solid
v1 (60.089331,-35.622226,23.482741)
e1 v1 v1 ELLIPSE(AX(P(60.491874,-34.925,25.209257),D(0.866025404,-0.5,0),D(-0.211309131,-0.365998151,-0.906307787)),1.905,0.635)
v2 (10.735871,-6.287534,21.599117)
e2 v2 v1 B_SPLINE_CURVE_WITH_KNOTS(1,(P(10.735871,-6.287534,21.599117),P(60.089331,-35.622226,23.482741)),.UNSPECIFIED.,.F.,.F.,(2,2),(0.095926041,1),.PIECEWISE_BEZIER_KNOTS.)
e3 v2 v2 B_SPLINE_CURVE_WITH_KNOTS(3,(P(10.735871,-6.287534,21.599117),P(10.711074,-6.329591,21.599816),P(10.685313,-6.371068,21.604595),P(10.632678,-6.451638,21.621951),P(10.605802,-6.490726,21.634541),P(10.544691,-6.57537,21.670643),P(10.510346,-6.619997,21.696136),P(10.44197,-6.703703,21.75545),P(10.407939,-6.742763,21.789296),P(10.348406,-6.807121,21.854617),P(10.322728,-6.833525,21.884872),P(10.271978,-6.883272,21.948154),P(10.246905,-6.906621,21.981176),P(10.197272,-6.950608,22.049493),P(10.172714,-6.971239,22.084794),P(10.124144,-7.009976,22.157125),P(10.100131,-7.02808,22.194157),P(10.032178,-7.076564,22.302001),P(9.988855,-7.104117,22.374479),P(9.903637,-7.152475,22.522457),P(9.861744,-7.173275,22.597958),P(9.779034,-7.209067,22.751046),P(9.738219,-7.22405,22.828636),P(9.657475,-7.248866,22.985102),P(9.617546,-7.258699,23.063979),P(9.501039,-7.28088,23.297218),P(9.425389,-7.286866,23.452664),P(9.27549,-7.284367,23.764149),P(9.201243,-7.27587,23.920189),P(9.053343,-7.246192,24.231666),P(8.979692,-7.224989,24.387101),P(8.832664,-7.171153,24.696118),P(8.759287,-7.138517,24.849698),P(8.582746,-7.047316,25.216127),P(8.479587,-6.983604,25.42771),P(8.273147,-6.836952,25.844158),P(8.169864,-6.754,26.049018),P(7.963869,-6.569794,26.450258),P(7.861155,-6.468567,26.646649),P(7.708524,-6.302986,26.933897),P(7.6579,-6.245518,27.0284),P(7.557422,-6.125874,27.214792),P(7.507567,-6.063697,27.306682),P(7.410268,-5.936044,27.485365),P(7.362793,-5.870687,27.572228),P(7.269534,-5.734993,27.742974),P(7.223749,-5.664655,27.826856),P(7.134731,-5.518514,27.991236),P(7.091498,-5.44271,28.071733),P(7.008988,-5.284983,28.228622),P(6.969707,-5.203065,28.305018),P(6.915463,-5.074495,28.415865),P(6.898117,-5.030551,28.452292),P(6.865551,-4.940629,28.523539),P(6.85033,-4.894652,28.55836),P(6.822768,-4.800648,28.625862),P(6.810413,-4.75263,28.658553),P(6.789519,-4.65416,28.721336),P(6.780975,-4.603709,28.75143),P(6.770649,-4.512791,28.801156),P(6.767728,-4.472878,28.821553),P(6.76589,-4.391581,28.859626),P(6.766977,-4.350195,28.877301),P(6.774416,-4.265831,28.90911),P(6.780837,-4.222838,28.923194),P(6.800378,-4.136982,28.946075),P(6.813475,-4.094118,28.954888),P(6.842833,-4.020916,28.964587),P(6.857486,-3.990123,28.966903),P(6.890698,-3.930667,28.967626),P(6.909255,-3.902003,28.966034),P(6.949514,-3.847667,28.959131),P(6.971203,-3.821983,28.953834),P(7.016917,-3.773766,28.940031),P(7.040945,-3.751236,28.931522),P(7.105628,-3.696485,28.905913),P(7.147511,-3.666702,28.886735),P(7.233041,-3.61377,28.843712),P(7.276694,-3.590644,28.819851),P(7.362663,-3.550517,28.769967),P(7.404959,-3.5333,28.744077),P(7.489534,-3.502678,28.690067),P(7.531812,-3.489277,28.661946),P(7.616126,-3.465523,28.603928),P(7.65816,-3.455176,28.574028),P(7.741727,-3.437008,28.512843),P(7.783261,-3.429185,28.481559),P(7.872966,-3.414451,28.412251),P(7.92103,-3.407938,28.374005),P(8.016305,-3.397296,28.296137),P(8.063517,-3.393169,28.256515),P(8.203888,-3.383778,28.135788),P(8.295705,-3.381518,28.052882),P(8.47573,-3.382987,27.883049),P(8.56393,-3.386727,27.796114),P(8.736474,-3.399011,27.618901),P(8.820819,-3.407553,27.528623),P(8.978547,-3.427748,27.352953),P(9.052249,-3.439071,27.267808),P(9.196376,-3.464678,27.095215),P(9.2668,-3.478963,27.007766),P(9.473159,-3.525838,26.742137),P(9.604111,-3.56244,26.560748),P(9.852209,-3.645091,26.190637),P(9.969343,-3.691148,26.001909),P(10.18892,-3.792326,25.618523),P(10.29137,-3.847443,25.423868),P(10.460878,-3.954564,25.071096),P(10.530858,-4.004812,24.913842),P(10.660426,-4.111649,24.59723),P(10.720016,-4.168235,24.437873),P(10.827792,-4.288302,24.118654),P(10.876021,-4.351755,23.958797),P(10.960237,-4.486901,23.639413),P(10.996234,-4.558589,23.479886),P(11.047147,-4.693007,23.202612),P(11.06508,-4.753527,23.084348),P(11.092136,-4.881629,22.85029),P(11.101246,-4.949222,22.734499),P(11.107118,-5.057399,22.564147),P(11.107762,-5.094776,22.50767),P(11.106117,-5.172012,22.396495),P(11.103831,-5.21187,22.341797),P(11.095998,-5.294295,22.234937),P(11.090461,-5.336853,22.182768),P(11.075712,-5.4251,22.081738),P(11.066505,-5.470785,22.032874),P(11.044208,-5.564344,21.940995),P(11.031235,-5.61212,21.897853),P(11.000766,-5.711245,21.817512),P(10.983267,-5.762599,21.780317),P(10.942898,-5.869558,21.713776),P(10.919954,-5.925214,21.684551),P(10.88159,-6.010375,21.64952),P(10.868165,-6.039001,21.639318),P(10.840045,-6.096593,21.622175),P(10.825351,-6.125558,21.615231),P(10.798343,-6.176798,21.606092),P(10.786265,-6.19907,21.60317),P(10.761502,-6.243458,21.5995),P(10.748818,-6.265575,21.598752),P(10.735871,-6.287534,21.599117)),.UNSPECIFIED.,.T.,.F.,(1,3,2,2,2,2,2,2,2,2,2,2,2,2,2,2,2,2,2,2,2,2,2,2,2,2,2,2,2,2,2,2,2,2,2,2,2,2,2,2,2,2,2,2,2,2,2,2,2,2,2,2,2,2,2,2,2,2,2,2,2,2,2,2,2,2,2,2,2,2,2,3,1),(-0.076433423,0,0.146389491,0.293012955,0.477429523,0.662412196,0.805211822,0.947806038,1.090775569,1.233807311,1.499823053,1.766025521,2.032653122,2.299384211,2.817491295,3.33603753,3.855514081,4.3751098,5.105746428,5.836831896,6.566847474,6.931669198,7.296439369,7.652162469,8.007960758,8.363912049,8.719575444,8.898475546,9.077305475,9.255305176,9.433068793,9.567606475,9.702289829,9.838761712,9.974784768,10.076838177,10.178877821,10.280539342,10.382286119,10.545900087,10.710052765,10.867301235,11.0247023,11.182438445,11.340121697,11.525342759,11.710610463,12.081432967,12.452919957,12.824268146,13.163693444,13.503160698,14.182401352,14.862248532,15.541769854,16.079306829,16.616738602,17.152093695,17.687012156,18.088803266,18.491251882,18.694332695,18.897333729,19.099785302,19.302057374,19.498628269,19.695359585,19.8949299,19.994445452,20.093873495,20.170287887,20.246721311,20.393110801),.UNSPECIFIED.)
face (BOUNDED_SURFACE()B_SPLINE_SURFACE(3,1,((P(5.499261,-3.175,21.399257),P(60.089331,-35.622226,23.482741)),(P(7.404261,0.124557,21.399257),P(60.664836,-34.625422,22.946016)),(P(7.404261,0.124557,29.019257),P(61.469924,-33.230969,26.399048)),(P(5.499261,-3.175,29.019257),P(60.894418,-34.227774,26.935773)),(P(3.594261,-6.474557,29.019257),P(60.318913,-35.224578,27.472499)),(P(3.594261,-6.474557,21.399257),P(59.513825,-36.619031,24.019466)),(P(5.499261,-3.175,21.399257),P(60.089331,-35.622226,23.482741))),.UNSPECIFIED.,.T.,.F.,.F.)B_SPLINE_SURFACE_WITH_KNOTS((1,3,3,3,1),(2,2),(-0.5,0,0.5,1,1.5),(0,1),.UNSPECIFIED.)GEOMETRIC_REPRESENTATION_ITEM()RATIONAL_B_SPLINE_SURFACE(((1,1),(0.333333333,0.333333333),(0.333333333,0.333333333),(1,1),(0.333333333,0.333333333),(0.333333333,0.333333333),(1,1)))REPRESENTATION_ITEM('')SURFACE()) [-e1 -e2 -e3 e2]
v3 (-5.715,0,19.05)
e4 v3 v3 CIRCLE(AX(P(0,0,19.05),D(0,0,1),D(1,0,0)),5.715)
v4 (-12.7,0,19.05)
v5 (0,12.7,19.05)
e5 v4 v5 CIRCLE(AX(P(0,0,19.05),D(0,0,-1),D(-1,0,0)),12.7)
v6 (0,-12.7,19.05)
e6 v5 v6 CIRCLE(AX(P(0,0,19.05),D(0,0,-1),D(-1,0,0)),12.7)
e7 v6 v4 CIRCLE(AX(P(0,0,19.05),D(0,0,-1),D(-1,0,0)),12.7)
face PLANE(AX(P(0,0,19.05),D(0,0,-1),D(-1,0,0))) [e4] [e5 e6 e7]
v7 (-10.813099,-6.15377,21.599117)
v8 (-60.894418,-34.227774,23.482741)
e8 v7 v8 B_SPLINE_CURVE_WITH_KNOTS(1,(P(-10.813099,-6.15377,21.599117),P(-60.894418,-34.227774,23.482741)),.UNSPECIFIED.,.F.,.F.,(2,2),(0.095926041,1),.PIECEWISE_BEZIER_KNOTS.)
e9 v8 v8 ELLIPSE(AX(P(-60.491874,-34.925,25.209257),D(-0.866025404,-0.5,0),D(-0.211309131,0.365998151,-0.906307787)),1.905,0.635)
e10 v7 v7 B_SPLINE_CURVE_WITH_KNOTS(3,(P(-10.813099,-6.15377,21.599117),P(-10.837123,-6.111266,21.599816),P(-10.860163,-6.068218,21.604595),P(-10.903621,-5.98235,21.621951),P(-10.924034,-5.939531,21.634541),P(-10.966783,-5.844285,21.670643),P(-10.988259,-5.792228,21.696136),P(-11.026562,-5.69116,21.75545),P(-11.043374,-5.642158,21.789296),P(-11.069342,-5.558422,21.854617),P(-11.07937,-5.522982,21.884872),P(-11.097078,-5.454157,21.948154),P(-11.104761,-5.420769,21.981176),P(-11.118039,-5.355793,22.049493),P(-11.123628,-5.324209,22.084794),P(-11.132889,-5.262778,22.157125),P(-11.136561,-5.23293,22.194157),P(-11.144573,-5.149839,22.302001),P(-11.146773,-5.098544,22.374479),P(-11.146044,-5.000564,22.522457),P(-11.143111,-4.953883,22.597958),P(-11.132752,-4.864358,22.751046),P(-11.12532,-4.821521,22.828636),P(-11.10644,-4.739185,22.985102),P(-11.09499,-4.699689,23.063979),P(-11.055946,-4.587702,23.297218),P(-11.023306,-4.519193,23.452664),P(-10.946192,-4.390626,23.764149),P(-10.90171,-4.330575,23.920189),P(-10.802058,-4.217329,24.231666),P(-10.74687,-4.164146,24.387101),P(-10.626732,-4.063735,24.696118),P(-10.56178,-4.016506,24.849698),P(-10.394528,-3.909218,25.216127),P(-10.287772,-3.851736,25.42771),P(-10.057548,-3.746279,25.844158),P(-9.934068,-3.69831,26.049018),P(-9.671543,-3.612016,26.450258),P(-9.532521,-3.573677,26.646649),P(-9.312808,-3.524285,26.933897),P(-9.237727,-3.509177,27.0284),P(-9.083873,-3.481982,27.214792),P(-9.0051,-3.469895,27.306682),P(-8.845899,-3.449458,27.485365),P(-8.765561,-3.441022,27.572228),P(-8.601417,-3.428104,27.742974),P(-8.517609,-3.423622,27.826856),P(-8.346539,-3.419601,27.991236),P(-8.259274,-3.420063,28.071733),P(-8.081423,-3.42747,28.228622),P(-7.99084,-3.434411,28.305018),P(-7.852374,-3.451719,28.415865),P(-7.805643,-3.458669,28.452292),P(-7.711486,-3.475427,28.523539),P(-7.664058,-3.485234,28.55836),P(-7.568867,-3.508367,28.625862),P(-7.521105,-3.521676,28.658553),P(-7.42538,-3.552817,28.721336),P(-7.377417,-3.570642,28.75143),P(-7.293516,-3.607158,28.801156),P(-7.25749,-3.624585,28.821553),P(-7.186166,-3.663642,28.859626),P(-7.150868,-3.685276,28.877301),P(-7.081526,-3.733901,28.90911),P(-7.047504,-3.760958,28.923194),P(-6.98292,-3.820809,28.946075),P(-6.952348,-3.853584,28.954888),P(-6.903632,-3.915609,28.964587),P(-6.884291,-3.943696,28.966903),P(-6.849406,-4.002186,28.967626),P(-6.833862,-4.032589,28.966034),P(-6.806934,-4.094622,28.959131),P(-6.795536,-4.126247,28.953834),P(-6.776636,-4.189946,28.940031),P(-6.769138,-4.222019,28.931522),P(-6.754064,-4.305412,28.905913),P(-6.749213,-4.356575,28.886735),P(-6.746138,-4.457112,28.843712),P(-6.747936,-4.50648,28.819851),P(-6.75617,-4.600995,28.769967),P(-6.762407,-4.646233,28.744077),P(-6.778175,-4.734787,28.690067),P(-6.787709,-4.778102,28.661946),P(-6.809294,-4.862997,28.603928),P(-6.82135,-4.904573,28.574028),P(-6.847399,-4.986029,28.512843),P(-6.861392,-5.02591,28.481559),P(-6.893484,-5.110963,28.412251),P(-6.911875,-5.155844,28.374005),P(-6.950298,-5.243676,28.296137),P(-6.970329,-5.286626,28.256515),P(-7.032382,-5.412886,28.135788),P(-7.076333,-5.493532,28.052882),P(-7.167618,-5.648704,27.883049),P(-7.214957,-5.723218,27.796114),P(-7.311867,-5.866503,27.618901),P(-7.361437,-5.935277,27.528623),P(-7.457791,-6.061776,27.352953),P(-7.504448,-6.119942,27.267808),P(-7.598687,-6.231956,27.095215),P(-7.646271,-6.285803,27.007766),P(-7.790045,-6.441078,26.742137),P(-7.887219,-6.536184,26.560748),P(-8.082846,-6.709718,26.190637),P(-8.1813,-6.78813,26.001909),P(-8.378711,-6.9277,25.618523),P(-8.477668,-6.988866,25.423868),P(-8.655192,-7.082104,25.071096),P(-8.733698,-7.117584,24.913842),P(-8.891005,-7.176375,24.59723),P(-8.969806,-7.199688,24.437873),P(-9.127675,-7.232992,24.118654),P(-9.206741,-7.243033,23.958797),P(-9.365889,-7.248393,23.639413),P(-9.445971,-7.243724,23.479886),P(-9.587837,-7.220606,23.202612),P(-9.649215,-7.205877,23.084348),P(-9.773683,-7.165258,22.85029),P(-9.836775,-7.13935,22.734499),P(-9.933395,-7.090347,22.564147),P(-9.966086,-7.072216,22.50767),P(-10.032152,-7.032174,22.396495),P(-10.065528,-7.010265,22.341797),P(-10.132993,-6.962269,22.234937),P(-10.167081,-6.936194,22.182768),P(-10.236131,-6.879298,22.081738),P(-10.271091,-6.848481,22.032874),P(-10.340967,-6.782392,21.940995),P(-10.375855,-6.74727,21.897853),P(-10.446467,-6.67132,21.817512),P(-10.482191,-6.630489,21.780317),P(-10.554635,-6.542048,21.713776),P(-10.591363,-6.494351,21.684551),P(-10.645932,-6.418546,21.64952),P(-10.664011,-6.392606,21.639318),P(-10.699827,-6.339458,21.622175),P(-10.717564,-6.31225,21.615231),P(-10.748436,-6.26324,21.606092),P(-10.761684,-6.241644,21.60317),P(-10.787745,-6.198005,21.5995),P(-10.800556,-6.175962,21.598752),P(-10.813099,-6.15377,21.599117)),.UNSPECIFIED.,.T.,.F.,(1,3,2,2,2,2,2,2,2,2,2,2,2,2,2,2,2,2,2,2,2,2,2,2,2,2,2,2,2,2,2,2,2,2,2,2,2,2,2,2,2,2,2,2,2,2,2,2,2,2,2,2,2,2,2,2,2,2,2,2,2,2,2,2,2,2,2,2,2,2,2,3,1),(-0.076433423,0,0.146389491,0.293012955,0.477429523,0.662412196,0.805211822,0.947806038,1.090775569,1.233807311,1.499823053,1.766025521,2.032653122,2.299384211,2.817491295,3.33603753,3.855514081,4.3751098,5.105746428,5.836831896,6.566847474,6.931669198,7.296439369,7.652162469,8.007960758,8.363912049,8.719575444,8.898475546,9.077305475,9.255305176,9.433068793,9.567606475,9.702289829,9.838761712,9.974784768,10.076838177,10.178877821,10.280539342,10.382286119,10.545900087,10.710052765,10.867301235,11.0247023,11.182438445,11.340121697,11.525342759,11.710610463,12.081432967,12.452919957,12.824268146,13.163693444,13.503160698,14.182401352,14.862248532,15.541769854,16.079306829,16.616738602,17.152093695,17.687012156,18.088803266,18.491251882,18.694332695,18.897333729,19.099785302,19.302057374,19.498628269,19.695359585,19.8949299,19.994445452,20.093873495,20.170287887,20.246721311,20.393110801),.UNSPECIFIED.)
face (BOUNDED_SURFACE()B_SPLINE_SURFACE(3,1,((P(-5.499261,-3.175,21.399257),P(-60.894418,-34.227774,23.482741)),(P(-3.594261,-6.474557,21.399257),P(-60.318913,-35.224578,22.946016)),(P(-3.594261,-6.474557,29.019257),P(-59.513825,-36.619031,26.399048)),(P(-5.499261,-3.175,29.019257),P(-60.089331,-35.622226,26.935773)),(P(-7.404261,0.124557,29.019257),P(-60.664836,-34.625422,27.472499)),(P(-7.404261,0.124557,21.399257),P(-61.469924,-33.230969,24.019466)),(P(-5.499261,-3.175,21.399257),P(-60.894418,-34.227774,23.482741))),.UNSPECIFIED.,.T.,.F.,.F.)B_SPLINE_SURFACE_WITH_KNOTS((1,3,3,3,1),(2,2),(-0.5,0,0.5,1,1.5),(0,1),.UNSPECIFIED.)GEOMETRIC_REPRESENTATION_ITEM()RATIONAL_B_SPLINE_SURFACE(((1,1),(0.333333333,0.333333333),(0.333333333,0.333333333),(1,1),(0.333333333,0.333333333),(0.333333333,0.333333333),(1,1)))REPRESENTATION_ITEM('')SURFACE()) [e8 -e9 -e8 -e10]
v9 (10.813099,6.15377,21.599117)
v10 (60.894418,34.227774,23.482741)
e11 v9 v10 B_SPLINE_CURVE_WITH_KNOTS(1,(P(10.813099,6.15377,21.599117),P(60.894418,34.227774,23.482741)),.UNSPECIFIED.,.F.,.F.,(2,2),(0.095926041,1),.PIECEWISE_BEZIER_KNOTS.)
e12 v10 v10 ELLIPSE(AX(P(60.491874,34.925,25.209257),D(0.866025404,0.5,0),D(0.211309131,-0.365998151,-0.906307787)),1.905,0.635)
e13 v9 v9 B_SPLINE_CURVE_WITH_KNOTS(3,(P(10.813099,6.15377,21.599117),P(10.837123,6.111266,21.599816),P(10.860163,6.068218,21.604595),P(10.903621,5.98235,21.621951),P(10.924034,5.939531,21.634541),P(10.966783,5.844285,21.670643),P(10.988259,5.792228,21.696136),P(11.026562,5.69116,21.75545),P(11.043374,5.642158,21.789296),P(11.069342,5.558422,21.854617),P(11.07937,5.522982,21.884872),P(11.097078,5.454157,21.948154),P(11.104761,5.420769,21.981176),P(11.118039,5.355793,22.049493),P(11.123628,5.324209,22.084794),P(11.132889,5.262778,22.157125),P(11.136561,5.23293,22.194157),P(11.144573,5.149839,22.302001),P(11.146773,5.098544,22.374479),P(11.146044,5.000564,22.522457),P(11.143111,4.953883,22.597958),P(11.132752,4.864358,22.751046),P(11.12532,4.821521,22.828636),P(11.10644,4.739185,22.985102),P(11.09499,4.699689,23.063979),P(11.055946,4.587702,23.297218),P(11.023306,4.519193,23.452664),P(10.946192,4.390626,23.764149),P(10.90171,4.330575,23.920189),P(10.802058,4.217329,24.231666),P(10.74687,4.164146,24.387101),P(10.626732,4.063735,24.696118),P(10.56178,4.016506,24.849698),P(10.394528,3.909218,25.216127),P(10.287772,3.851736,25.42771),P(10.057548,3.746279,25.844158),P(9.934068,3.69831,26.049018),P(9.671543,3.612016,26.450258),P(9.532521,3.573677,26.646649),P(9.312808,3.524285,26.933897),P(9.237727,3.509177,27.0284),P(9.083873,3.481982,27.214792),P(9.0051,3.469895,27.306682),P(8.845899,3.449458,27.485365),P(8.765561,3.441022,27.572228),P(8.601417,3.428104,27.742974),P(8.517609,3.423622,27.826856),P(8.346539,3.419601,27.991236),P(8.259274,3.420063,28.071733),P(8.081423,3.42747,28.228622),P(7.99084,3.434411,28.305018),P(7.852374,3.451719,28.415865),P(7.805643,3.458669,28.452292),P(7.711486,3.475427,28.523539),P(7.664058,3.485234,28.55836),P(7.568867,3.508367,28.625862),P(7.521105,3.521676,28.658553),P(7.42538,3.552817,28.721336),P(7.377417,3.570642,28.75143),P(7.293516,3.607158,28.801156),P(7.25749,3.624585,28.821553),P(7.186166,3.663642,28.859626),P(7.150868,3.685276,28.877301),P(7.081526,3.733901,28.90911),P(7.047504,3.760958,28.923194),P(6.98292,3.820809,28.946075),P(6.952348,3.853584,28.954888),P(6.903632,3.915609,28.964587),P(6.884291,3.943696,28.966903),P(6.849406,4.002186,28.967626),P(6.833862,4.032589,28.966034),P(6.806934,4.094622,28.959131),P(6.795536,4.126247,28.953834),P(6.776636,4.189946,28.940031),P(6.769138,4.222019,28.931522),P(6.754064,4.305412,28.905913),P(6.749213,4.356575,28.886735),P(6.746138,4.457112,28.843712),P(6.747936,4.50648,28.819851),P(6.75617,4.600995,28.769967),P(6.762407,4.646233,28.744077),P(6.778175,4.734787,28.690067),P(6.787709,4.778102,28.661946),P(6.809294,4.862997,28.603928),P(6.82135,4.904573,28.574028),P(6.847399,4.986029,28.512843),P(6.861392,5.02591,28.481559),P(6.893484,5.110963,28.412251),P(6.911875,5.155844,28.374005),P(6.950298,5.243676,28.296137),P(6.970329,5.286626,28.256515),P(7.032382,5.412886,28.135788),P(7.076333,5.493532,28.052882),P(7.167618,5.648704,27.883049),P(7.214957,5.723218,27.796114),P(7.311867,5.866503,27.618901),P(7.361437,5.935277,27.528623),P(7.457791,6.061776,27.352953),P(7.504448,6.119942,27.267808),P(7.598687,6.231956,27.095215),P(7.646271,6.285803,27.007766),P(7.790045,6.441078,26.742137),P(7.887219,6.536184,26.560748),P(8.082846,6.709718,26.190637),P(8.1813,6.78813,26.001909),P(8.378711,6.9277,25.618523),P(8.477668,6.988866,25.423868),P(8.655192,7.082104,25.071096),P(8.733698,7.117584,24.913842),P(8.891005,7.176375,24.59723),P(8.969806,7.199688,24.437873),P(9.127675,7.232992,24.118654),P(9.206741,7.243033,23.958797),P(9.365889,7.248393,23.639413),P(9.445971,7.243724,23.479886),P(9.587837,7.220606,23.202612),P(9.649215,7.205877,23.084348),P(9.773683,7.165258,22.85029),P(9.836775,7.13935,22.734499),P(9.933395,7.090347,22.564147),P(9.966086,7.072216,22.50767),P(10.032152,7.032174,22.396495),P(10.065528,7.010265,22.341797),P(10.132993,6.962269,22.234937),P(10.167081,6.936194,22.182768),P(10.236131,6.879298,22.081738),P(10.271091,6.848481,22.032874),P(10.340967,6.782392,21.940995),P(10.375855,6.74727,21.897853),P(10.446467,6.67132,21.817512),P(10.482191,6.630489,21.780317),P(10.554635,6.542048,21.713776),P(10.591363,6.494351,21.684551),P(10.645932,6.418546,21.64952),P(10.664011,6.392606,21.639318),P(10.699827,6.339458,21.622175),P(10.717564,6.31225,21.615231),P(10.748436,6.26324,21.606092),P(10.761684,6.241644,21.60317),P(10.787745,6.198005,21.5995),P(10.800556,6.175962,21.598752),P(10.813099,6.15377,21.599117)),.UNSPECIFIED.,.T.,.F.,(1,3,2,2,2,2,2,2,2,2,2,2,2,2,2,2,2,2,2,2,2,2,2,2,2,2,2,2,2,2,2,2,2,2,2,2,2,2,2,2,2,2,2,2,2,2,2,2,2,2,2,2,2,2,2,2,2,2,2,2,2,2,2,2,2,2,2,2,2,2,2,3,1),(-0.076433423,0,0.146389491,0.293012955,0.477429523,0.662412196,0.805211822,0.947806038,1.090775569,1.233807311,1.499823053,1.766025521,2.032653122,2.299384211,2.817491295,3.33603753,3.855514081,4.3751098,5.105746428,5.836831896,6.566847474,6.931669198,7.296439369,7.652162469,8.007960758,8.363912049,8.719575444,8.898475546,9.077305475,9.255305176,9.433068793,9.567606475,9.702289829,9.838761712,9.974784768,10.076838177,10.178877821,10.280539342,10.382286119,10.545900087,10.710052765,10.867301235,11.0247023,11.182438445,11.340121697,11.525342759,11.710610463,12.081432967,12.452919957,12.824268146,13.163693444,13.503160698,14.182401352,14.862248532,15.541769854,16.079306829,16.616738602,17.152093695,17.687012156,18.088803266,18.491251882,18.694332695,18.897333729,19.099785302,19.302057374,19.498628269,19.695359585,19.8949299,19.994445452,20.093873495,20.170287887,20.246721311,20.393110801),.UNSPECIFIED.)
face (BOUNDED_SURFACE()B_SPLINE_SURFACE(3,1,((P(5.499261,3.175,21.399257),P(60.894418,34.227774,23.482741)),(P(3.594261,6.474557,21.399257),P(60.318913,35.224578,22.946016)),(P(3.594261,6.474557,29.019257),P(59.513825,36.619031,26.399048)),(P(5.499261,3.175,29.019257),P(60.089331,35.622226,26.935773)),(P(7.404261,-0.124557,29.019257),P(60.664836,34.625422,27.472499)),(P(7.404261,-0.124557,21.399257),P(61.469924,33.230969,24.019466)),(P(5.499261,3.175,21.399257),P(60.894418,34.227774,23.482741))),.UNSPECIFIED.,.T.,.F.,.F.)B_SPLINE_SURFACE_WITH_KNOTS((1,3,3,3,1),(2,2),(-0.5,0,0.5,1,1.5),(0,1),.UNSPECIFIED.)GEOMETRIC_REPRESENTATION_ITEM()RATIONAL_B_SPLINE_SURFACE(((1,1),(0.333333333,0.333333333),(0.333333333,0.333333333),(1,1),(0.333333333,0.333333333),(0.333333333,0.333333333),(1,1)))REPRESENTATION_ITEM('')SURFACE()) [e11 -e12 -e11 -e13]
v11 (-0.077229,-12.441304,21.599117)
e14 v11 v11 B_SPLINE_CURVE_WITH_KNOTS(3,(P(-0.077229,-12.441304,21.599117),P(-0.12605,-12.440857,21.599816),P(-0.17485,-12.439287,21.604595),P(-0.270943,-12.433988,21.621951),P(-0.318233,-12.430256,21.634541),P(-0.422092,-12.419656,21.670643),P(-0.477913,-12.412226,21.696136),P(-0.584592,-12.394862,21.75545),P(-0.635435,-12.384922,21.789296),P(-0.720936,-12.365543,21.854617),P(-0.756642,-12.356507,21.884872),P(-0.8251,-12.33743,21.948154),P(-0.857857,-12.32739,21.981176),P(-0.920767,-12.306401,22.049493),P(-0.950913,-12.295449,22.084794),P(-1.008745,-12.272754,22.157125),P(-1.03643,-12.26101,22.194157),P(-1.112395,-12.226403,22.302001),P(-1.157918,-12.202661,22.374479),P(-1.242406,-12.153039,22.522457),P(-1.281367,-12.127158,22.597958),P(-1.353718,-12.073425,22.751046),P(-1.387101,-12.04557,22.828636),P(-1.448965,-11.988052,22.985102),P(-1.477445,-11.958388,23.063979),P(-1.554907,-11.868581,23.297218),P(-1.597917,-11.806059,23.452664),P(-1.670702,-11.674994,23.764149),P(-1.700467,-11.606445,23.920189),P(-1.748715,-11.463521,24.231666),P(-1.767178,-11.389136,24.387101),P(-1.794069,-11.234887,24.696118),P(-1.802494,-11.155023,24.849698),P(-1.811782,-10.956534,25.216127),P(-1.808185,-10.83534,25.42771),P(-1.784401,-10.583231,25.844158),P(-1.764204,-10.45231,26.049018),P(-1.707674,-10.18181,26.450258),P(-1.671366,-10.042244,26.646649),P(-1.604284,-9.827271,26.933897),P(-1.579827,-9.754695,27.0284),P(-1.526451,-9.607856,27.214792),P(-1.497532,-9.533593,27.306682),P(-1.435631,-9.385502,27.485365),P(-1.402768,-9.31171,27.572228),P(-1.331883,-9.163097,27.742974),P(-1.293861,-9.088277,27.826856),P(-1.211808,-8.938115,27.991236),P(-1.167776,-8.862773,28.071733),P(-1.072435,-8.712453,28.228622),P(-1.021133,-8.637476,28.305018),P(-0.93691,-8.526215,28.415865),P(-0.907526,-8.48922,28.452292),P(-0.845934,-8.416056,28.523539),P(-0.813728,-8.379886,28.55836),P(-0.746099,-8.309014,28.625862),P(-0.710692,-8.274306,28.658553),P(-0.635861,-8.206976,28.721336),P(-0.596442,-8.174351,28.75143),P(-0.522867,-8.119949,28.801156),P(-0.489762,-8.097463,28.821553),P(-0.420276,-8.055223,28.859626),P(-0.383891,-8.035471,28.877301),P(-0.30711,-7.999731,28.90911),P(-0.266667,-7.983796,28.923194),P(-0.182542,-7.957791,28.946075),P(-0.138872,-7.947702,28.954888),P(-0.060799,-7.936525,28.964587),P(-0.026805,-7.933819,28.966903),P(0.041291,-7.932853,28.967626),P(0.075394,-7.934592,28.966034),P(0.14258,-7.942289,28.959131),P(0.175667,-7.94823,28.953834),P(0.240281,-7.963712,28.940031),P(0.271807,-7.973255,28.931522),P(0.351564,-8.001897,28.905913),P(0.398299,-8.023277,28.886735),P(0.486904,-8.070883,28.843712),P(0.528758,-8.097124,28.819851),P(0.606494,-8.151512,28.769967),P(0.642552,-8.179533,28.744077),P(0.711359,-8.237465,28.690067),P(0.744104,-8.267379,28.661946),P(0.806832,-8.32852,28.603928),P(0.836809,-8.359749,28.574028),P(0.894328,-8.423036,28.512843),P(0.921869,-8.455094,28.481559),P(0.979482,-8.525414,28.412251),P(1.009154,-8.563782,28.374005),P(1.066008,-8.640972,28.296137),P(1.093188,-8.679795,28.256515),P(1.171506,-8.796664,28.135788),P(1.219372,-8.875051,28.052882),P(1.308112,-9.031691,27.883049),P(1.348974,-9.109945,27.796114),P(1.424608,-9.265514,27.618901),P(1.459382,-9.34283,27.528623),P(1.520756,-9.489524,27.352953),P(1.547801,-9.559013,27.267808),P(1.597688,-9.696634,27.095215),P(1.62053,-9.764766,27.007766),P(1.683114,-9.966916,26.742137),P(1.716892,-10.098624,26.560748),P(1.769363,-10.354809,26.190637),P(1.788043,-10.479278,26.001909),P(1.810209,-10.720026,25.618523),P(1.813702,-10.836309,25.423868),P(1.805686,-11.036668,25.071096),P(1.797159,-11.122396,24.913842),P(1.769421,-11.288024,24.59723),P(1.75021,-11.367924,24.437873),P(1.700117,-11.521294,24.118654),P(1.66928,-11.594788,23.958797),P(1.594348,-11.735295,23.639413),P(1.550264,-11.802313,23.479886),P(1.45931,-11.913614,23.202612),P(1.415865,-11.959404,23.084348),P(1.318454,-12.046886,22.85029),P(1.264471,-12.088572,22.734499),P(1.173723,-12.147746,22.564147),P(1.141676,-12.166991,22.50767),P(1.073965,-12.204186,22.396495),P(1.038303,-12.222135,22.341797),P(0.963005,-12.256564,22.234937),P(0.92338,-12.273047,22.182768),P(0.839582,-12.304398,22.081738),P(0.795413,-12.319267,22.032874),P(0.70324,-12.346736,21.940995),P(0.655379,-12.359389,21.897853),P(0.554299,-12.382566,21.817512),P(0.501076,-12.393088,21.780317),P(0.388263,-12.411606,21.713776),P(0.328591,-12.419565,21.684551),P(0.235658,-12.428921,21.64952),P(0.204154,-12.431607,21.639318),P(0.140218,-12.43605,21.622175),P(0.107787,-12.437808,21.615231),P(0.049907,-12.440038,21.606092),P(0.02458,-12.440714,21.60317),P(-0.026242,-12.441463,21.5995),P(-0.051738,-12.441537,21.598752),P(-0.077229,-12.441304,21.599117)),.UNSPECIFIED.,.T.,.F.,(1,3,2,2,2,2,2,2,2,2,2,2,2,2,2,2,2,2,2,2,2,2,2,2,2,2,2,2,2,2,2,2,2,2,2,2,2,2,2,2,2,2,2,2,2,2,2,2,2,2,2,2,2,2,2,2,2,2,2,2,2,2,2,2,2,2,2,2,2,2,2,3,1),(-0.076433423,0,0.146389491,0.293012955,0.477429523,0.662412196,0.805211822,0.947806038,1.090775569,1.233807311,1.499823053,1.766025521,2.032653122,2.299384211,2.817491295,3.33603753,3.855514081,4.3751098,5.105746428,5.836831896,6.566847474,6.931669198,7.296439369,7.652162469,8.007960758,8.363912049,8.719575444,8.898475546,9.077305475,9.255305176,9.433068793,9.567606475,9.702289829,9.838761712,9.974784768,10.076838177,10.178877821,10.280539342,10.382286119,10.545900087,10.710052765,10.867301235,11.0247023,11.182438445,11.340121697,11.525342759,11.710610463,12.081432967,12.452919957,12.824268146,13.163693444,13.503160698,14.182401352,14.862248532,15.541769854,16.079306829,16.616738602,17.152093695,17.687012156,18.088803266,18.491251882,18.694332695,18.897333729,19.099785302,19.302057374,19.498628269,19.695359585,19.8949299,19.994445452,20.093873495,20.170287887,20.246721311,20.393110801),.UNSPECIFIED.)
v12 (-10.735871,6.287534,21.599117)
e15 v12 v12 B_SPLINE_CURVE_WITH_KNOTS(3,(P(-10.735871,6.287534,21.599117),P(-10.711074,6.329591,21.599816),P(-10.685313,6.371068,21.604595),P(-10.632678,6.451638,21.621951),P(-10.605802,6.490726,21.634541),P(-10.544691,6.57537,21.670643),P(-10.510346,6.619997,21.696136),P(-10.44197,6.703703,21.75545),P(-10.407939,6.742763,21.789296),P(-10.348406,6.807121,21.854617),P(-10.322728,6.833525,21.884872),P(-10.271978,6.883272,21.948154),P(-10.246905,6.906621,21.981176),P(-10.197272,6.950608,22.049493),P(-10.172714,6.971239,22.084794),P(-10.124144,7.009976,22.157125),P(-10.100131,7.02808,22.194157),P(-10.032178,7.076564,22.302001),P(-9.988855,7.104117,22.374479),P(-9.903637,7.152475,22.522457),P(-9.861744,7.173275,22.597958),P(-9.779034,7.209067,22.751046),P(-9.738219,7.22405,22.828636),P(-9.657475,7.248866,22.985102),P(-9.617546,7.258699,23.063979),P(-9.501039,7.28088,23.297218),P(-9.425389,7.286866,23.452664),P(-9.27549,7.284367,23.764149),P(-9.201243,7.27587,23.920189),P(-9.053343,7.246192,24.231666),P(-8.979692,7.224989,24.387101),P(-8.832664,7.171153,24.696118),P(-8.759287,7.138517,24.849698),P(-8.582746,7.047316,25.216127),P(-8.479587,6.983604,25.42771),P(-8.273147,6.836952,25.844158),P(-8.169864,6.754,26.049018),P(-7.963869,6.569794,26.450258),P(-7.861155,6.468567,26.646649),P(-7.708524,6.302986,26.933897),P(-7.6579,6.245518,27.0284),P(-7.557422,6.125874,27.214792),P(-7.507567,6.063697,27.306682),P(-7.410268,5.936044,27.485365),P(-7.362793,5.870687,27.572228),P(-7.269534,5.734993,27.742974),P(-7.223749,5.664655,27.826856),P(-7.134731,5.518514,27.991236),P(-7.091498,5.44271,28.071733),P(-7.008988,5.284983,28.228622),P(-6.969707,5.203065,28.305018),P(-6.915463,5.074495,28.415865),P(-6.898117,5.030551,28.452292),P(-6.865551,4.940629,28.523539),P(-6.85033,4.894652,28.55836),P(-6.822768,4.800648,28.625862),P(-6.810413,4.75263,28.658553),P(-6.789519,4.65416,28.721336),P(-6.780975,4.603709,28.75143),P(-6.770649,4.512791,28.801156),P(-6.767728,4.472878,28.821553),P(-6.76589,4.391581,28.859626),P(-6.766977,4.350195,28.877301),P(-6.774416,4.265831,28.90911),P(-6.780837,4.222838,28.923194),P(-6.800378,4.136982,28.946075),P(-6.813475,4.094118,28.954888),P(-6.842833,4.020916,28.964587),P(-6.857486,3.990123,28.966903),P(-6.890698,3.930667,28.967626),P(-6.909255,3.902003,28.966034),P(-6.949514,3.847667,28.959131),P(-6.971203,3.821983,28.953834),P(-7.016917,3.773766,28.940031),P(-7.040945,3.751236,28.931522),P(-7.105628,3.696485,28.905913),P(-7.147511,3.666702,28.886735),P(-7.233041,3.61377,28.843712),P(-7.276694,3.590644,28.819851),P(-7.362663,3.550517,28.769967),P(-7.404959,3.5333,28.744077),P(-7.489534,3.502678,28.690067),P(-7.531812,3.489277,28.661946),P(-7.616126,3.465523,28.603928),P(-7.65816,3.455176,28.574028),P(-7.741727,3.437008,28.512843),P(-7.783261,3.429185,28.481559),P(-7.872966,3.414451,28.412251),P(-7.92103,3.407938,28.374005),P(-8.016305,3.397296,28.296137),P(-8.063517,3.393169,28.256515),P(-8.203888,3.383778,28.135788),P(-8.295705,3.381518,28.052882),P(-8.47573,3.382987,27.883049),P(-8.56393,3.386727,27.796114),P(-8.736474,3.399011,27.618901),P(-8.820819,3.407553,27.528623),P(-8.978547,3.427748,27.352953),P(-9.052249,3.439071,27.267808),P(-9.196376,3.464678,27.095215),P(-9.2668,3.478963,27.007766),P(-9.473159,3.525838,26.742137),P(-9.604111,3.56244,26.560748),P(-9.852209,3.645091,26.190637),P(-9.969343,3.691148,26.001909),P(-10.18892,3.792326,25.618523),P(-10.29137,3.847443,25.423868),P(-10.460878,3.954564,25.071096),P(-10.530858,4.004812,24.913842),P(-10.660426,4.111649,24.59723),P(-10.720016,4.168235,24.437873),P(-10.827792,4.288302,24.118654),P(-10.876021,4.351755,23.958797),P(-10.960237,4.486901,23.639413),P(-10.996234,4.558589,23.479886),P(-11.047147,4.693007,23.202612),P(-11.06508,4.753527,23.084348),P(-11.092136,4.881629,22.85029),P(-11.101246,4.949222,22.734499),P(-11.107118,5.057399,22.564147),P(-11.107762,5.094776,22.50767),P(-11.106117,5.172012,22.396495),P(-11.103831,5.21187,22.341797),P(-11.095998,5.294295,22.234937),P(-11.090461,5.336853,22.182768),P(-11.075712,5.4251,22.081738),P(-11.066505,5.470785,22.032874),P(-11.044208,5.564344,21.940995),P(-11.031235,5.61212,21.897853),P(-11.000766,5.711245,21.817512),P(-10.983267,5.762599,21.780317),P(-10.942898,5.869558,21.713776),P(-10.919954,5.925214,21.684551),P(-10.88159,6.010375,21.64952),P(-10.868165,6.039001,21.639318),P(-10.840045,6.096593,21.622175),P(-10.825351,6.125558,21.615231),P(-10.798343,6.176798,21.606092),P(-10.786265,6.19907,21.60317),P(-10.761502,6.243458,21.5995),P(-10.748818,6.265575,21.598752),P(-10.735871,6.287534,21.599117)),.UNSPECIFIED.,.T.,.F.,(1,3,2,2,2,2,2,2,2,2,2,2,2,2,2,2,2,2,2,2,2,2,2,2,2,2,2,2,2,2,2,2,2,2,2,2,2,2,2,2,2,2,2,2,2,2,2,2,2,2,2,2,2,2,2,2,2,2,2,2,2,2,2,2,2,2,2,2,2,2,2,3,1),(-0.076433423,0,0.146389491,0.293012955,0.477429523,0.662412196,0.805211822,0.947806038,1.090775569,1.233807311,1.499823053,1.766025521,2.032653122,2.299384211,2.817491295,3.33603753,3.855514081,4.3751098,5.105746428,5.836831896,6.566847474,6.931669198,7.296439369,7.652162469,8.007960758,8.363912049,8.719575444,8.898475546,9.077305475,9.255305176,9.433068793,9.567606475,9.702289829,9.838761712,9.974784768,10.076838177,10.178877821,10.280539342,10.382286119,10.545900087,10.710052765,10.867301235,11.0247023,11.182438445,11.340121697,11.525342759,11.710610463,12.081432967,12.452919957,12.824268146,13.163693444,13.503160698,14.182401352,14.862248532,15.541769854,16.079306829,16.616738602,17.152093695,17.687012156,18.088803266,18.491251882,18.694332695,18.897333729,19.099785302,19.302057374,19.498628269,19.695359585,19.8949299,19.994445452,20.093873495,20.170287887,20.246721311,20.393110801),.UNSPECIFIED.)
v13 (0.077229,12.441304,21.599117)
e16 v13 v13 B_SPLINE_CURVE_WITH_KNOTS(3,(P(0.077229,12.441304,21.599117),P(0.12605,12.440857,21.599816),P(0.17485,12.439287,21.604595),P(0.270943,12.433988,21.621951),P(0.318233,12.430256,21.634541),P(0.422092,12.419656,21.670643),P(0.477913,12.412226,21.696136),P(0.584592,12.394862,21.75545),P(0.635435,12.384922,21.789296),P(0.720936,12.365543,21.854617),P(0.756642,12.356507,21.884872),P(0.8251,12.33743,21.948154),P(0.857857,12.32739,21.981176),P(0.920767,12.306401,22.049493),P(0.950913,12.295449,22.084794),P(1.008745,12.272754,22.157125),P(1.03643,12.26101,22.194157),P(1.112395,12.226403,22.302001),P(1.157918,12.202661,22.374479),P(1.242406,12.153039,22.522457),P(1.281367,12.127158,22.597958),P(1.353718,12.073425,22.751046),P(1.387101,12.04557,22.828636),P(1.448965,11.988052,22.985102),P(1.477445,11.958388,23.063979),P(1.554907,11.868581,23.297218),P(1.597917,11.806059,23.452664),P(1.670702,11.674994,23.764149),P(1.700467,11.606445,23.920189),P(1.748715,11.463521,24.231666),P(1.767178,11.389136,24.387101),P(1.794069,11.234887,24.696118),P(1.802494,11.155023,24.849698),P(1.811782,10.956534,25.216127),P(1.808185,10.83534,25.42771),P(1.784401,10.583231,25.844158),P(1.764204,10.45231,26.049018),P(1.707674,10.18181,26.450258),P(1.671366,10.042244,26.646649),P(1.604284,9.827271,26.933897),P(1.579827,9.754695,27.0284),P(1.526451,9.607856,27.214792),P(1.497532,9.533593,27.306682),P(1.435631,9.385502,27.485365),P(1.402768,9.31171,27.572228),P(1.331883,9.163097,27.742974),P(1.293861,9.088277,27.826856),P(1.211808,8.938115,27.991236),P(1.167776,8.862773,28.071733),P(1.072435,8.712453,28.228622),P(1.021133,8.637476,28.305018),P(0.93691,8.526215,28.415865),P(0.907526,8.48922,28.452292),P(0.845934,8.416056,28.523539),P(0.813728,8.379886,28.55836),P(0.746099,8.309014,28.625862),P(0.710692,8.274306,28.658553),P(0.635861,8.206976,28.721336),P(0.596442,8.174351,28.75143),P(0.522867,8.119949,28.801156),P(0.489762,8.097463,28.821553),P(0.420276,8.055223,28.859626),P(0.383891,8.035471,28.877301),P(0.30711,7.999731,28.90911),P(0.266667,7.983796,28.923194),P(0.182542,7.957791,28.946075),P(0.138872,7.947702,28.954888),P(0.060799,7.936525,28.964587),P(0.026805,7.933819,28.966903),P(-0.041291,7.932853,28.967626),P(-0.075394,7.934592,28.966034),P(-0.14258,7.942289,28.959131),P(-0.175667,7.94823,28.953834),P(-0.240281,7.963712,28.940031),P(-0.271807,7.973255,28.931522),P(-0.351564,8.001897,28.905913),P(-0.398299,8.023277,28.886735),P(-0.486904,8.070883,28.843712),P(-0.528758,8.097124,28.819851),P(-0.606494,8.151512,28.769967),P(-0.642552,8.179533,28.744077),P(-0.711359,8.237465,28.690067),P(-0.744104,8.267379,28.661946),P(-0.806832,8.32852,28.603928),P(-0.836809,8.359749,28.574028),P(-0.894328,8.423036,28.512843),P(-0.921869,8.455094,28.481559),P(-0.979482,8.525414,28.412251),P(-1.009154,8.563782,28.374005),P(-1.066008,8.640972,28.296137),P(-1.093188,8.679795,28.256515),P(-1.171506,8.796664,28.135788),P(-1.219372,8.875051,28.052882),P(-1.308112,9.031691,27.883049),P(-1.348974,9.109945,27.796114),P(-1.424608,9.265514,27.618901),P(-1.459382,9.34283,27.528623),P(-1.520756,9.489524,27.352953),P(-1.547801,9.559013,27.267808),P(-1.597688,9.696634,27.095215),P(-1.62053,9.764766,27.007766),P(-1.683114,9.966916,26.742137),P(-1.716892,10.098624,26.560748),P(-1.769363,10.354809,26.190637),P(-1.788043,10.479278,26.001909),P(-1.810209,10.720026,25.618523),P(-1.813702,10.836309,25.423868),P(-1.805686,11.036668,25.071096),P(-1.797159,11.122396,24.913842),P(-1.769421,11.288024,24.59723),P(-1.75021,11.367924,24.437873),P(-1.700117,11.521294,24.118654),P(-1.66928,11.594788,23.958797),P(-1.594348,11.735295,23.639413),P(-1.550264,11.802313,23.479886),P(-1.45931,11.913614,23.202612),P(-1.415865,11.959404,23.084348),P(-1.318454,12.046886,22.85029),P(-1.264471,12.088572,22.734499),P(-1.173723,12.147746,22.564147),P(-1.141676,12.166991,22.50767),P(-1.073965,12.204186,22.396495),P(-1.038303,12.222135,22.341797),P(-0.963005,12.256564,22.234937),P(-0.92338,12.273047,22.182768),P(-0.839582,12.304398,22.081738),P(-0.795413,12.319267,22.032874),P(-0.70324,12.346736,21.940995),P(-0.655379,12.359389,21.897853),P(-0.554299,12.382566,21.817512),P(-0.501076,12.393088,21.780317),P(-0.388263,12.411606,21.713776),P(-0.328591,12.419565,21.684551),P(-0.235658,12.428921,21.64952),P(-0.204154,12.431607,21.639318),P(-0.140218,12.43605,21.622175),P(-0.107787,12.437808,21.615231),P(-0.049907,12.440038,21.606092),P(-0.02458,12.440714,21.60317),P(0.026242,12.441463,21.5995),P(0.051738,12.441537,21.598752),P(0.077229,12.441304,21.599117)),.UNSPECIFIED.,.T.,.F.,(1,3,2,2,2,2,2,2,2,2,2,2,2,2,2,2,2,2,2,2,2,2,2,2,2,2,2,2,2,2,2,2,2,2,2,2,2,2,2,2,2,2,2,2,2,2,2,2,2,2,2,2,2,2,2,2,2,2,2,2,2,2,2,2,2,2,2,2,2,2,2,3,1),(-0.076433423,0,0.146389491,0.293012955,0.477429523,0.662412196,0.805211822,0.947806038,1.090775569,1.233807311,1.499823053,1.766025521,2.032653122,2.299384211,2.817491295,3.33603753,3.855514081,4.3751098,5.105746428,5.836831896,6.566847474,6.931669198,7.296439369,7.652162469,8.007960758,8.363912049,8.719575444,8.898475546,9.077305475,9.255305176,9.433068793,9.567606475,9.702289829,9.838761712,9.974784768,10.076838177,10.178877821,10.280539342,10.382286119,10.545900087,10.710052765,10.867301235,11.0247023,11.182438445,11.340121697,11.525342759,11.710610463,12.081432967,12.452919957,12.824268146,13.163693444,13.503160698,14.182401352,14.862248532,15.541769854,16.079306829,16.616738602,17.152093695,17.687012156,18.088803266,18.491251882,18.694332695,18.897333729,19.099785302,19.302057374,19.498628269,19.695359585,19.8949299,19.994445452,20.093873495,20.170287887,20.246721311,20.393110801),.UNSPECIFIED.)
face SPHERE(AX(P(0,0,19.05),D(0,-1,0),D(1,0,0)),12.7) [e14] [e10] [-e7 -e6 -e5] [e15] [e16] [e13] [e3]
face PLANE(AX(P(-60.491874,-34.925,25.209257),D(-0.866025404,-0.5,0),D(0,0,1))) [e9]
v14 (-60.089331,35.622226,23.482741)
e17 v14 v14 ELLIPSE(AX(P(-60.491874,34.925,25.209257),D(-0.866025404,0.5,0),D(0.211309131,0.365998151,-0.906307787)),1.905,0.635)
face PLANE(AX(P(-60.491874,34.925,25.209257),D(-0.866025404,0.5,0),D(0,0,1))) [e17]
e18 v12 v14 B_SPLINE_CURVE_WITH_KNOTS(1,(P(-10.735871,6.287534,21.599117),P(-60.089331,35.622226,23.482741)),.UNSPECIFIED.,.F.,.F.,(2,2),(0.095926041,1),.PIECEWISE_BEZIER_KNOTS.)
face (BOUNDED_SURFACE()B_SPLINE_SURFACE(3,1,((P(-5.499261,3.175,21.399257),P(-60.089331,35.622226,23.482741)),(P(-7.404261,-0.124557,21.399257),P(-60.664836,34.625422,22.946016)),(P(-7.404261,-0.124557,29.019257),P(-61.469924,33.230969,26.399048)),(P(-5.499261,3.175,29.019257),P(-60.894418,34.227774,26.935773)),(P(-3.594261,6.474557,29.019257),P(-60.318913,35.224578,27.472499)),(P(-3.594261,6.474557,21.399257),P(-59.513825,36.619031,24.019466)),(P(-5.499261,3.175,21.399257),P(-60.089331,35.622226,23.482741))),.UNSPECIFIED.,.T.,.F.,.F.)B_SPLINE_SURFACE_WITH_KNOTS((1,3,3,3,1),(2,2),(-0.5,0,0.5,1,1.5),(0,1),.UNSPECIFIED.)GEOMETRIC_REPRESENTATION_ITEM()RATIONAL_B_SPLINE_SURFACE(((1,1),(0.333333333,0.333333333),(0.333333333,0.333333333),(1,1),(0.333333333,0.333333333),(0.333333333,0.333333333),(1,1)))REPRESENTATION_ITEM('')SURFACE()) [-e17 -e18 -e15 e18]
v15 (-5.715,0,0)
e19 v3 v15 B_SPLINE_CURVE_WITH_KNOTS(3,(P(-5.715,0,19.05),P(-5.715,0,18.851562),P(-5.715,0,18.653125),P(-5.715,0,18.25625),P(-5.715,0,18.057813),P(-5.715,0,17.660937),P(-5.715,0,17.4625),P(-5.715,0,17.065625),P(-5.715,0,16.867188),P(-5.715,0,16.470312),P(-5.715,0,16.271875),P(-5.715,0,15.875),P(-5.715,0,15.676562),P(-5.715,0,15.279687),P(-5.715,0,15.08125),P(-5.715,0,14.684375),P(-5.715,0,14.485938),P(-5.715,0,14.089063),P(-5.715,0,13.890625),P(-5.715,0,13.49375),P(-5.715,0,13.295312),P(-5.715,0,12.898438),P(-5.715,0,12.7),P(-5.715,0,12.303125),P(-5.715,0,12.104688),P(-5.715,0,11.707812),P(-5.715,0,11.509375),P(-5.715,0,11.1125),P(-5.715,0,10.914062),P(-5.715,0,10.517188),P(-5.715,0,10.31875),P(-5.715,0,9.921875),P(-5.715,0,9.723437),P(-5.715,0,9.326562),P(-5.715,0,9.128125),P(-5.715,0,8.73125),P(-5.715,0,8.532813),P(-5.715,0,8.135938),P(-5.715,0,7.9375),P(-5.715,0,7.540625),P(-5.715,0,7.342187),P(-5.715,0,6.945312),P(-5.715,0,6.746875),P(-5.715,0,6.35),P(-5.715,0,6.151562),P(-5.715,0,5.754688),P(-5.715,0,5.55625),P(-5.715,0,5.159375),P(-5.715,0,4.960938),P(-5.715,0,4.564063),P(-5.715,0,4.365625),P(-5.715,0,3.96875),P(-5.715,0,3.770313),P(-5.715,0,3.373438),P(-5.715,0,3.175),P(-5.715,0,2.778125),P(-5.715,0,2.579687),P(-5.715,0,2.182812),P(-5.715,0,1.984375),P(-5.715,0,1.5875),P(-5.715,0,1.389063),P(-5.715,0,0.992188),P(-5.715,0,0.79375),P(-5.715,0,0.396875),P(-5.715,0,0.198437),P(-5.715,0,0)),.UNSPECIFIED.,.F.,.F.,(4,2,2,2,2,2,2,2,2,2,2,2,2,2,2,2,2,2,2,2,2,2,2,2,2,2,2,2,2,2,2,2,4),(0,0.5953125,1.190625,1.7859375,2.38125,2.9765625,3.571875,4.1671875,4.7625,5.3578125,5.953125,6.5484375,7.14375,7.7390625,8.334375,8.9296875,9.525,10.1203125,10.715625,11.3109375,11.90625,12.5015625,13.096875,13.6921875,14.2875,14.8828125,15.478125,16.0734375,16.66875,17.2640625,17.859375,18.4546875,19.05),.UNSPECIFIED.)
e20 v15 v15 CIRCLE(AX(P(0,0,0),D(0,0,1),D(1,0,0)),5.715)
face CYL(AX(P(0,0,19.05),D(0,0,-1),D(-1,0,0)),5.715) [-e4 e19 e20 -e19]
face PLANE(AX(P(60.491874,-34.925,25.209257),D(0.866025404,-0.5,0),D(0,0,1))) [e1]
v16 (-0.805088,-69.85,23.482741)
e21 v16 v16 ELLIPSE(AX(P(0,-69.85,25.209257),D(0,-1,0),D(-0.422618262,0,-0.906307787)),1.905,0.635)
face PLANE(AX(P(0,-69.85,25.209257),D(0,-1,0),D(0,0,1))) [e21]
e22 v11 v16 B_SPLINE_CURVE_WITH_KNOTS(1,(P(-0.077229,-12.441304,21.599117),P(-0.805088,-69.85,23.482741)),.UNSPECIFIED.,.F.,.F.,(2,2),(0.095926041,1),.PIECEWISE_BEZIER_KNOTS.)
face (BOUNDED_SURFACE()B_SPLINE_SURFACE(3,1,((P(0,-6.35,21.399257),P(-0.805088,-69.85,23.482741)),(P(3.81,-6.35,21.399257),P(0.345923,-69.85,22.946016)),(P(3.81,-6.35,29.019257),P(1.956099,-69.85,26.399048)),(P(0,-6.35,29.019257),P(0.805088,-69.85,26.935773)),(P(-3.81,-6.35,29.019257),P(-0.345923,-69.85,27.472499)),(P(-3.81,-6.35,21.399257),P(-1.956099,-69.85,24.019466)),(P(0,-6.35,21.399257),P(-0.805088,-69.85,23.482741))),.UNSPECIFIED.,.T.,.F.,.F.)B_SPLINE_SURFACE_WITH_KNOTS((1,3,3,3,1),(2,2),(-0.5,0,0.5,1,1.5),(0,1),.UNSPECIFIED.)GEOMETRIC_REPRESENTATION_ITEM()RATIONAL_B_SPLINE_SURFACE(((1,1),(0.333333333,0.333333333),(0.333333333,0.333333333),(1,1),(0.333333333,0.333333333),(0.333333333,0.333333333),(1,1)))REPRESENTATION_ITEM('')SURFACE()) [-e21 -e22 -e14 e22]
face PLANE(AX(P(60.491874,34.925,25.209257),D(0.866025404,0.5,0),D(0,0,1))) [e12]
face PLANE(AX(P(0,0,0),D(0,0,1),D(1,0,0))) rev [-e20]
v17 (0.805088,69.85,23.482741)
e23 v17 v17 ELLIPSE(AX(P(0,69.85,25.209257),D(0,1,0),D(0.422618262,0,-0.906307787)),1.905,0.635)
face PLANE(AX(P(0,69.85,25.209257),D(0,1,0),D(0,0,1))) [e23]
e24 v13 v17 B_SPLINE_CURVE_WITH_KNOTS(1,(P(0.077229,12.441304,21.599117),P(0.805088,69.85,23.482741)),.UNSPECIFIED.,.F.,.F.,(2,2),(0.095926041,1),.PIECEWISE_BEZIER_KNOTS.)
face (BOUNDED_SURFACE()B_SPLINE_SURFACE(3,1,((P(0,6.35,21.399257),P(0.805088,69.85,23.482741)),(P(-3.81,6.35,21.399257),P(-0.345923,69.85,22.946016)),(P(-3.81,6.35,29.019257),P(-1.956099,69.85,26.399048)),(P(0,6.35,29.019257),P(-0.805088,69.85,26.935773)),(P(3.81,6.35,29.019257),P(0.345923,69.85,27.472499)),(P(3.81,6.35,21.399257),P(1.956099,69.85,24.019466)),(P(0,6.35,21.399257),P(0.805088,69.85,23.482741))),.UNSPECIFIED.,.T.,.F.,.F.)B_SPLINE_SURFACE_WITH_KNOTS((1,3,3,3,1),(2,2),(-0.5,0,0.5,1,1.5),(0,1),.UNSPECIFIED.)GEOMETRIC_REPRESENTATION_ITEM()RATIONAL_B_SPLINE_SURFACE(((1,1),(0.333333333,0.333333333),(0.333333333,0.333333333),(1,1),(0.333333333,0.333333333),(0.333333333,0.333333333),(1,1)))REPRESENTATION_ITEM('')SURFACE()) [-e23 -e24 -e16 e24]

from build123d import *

# Parameters (mm, degrees)
SKETCH1_R           = 5.715
BOSS_EXTRUDE1_DEPTH = 19.05
REVOLVE2_ANGLE      = 180
CIRPATTERN1_COUNT   = 6


with BuildPart() as part:
    # Sketch1 → Boss-Extrude1 (new body)
    with BuildSketch(Plane.XY):
        with Locations(Location((0, 0, 0), (0, 0, 180))):
            Circle(SKETCH1_R)
    extrude(amount=BOSS_EXTRUDE1_DEPTH)

    # Sketch3 → Revolve2 (revolve)
    with BuildSketch(Plane.XY.offset(19.05)):
        with BuildLine():
            Line((0, 12.7), (0, -12.7))
            ThreePointArc((0, -12.7), (-12.7, 0), (0, 12.7))
        make_face()
    revolve(axis=Axis((0, 12.7, 19.05), (0, 1, 0)), revolution_arc=REVOLVE2_ANGLE)

    # Loft2: read off the stored shape, not the designer's step
    # Loft2: loft between two sections, ruled curve by curve
    loft2_from = [
        Edge.make_bspline([(0, 6.35, 21.399257076), (-3.81, 6.35, 21.399257076), (-3.81, 6.35, 29.019257076), (0, 6.35, 29.019257076), (3.81, 6.35, 29.019257076), (3.81, 6.35, 21.399257076), (0, 6.35, 21.399257076)], [0, 0, 0, 0, 0.5, 0.5, 0.5, 1, 1, 1, 1], 3, [1, 0.333333333, 0.333333333, 1, 0.333333333, 0.333333333, 1]),
    ]
    loft2_to = [
        Edge.make_bspline([(0.805087789, 69.85, 23.482740742), (-0.345923101, 69.85, 22.946015549), (-1.956098678, 69.85, 26.399048218), (-0.805087789, 69.85, 26.93577341), (0.345923101, 69.85, 27.472498603), (1.956098678, 69.85, 24.019465934), (0.805087789, 69.85, 23.482740742)], [0, 0, 0, 0, 0.5, 0.5, 0.5, 1, 1, 1, 1], 3, [1, 0.333333333, 0.333333333, 1, 0.333333333, 0.333333333, 1]),
    ]
    loft2 = Solid(Shell([*[Face.make_surface_from_curves(loft2_from[k], loft2_to[k]) for k in range(1)], Face(Wire(loft2_from)), Face(Wire(loft2_to))]))
    add(loft2)

    # CirPattern1: Loft2 ×6 about axis
    cirpattern1_axis = Axis((0, 0, 63.842193769), (0, 0, -1))
    for i in range(1, CIRPATTERN1_COUNT):
        add(loft2.rotate(cirpattern1_axis, i * 360 / CIRPATTERN1_COUNT))


solid = part.part
